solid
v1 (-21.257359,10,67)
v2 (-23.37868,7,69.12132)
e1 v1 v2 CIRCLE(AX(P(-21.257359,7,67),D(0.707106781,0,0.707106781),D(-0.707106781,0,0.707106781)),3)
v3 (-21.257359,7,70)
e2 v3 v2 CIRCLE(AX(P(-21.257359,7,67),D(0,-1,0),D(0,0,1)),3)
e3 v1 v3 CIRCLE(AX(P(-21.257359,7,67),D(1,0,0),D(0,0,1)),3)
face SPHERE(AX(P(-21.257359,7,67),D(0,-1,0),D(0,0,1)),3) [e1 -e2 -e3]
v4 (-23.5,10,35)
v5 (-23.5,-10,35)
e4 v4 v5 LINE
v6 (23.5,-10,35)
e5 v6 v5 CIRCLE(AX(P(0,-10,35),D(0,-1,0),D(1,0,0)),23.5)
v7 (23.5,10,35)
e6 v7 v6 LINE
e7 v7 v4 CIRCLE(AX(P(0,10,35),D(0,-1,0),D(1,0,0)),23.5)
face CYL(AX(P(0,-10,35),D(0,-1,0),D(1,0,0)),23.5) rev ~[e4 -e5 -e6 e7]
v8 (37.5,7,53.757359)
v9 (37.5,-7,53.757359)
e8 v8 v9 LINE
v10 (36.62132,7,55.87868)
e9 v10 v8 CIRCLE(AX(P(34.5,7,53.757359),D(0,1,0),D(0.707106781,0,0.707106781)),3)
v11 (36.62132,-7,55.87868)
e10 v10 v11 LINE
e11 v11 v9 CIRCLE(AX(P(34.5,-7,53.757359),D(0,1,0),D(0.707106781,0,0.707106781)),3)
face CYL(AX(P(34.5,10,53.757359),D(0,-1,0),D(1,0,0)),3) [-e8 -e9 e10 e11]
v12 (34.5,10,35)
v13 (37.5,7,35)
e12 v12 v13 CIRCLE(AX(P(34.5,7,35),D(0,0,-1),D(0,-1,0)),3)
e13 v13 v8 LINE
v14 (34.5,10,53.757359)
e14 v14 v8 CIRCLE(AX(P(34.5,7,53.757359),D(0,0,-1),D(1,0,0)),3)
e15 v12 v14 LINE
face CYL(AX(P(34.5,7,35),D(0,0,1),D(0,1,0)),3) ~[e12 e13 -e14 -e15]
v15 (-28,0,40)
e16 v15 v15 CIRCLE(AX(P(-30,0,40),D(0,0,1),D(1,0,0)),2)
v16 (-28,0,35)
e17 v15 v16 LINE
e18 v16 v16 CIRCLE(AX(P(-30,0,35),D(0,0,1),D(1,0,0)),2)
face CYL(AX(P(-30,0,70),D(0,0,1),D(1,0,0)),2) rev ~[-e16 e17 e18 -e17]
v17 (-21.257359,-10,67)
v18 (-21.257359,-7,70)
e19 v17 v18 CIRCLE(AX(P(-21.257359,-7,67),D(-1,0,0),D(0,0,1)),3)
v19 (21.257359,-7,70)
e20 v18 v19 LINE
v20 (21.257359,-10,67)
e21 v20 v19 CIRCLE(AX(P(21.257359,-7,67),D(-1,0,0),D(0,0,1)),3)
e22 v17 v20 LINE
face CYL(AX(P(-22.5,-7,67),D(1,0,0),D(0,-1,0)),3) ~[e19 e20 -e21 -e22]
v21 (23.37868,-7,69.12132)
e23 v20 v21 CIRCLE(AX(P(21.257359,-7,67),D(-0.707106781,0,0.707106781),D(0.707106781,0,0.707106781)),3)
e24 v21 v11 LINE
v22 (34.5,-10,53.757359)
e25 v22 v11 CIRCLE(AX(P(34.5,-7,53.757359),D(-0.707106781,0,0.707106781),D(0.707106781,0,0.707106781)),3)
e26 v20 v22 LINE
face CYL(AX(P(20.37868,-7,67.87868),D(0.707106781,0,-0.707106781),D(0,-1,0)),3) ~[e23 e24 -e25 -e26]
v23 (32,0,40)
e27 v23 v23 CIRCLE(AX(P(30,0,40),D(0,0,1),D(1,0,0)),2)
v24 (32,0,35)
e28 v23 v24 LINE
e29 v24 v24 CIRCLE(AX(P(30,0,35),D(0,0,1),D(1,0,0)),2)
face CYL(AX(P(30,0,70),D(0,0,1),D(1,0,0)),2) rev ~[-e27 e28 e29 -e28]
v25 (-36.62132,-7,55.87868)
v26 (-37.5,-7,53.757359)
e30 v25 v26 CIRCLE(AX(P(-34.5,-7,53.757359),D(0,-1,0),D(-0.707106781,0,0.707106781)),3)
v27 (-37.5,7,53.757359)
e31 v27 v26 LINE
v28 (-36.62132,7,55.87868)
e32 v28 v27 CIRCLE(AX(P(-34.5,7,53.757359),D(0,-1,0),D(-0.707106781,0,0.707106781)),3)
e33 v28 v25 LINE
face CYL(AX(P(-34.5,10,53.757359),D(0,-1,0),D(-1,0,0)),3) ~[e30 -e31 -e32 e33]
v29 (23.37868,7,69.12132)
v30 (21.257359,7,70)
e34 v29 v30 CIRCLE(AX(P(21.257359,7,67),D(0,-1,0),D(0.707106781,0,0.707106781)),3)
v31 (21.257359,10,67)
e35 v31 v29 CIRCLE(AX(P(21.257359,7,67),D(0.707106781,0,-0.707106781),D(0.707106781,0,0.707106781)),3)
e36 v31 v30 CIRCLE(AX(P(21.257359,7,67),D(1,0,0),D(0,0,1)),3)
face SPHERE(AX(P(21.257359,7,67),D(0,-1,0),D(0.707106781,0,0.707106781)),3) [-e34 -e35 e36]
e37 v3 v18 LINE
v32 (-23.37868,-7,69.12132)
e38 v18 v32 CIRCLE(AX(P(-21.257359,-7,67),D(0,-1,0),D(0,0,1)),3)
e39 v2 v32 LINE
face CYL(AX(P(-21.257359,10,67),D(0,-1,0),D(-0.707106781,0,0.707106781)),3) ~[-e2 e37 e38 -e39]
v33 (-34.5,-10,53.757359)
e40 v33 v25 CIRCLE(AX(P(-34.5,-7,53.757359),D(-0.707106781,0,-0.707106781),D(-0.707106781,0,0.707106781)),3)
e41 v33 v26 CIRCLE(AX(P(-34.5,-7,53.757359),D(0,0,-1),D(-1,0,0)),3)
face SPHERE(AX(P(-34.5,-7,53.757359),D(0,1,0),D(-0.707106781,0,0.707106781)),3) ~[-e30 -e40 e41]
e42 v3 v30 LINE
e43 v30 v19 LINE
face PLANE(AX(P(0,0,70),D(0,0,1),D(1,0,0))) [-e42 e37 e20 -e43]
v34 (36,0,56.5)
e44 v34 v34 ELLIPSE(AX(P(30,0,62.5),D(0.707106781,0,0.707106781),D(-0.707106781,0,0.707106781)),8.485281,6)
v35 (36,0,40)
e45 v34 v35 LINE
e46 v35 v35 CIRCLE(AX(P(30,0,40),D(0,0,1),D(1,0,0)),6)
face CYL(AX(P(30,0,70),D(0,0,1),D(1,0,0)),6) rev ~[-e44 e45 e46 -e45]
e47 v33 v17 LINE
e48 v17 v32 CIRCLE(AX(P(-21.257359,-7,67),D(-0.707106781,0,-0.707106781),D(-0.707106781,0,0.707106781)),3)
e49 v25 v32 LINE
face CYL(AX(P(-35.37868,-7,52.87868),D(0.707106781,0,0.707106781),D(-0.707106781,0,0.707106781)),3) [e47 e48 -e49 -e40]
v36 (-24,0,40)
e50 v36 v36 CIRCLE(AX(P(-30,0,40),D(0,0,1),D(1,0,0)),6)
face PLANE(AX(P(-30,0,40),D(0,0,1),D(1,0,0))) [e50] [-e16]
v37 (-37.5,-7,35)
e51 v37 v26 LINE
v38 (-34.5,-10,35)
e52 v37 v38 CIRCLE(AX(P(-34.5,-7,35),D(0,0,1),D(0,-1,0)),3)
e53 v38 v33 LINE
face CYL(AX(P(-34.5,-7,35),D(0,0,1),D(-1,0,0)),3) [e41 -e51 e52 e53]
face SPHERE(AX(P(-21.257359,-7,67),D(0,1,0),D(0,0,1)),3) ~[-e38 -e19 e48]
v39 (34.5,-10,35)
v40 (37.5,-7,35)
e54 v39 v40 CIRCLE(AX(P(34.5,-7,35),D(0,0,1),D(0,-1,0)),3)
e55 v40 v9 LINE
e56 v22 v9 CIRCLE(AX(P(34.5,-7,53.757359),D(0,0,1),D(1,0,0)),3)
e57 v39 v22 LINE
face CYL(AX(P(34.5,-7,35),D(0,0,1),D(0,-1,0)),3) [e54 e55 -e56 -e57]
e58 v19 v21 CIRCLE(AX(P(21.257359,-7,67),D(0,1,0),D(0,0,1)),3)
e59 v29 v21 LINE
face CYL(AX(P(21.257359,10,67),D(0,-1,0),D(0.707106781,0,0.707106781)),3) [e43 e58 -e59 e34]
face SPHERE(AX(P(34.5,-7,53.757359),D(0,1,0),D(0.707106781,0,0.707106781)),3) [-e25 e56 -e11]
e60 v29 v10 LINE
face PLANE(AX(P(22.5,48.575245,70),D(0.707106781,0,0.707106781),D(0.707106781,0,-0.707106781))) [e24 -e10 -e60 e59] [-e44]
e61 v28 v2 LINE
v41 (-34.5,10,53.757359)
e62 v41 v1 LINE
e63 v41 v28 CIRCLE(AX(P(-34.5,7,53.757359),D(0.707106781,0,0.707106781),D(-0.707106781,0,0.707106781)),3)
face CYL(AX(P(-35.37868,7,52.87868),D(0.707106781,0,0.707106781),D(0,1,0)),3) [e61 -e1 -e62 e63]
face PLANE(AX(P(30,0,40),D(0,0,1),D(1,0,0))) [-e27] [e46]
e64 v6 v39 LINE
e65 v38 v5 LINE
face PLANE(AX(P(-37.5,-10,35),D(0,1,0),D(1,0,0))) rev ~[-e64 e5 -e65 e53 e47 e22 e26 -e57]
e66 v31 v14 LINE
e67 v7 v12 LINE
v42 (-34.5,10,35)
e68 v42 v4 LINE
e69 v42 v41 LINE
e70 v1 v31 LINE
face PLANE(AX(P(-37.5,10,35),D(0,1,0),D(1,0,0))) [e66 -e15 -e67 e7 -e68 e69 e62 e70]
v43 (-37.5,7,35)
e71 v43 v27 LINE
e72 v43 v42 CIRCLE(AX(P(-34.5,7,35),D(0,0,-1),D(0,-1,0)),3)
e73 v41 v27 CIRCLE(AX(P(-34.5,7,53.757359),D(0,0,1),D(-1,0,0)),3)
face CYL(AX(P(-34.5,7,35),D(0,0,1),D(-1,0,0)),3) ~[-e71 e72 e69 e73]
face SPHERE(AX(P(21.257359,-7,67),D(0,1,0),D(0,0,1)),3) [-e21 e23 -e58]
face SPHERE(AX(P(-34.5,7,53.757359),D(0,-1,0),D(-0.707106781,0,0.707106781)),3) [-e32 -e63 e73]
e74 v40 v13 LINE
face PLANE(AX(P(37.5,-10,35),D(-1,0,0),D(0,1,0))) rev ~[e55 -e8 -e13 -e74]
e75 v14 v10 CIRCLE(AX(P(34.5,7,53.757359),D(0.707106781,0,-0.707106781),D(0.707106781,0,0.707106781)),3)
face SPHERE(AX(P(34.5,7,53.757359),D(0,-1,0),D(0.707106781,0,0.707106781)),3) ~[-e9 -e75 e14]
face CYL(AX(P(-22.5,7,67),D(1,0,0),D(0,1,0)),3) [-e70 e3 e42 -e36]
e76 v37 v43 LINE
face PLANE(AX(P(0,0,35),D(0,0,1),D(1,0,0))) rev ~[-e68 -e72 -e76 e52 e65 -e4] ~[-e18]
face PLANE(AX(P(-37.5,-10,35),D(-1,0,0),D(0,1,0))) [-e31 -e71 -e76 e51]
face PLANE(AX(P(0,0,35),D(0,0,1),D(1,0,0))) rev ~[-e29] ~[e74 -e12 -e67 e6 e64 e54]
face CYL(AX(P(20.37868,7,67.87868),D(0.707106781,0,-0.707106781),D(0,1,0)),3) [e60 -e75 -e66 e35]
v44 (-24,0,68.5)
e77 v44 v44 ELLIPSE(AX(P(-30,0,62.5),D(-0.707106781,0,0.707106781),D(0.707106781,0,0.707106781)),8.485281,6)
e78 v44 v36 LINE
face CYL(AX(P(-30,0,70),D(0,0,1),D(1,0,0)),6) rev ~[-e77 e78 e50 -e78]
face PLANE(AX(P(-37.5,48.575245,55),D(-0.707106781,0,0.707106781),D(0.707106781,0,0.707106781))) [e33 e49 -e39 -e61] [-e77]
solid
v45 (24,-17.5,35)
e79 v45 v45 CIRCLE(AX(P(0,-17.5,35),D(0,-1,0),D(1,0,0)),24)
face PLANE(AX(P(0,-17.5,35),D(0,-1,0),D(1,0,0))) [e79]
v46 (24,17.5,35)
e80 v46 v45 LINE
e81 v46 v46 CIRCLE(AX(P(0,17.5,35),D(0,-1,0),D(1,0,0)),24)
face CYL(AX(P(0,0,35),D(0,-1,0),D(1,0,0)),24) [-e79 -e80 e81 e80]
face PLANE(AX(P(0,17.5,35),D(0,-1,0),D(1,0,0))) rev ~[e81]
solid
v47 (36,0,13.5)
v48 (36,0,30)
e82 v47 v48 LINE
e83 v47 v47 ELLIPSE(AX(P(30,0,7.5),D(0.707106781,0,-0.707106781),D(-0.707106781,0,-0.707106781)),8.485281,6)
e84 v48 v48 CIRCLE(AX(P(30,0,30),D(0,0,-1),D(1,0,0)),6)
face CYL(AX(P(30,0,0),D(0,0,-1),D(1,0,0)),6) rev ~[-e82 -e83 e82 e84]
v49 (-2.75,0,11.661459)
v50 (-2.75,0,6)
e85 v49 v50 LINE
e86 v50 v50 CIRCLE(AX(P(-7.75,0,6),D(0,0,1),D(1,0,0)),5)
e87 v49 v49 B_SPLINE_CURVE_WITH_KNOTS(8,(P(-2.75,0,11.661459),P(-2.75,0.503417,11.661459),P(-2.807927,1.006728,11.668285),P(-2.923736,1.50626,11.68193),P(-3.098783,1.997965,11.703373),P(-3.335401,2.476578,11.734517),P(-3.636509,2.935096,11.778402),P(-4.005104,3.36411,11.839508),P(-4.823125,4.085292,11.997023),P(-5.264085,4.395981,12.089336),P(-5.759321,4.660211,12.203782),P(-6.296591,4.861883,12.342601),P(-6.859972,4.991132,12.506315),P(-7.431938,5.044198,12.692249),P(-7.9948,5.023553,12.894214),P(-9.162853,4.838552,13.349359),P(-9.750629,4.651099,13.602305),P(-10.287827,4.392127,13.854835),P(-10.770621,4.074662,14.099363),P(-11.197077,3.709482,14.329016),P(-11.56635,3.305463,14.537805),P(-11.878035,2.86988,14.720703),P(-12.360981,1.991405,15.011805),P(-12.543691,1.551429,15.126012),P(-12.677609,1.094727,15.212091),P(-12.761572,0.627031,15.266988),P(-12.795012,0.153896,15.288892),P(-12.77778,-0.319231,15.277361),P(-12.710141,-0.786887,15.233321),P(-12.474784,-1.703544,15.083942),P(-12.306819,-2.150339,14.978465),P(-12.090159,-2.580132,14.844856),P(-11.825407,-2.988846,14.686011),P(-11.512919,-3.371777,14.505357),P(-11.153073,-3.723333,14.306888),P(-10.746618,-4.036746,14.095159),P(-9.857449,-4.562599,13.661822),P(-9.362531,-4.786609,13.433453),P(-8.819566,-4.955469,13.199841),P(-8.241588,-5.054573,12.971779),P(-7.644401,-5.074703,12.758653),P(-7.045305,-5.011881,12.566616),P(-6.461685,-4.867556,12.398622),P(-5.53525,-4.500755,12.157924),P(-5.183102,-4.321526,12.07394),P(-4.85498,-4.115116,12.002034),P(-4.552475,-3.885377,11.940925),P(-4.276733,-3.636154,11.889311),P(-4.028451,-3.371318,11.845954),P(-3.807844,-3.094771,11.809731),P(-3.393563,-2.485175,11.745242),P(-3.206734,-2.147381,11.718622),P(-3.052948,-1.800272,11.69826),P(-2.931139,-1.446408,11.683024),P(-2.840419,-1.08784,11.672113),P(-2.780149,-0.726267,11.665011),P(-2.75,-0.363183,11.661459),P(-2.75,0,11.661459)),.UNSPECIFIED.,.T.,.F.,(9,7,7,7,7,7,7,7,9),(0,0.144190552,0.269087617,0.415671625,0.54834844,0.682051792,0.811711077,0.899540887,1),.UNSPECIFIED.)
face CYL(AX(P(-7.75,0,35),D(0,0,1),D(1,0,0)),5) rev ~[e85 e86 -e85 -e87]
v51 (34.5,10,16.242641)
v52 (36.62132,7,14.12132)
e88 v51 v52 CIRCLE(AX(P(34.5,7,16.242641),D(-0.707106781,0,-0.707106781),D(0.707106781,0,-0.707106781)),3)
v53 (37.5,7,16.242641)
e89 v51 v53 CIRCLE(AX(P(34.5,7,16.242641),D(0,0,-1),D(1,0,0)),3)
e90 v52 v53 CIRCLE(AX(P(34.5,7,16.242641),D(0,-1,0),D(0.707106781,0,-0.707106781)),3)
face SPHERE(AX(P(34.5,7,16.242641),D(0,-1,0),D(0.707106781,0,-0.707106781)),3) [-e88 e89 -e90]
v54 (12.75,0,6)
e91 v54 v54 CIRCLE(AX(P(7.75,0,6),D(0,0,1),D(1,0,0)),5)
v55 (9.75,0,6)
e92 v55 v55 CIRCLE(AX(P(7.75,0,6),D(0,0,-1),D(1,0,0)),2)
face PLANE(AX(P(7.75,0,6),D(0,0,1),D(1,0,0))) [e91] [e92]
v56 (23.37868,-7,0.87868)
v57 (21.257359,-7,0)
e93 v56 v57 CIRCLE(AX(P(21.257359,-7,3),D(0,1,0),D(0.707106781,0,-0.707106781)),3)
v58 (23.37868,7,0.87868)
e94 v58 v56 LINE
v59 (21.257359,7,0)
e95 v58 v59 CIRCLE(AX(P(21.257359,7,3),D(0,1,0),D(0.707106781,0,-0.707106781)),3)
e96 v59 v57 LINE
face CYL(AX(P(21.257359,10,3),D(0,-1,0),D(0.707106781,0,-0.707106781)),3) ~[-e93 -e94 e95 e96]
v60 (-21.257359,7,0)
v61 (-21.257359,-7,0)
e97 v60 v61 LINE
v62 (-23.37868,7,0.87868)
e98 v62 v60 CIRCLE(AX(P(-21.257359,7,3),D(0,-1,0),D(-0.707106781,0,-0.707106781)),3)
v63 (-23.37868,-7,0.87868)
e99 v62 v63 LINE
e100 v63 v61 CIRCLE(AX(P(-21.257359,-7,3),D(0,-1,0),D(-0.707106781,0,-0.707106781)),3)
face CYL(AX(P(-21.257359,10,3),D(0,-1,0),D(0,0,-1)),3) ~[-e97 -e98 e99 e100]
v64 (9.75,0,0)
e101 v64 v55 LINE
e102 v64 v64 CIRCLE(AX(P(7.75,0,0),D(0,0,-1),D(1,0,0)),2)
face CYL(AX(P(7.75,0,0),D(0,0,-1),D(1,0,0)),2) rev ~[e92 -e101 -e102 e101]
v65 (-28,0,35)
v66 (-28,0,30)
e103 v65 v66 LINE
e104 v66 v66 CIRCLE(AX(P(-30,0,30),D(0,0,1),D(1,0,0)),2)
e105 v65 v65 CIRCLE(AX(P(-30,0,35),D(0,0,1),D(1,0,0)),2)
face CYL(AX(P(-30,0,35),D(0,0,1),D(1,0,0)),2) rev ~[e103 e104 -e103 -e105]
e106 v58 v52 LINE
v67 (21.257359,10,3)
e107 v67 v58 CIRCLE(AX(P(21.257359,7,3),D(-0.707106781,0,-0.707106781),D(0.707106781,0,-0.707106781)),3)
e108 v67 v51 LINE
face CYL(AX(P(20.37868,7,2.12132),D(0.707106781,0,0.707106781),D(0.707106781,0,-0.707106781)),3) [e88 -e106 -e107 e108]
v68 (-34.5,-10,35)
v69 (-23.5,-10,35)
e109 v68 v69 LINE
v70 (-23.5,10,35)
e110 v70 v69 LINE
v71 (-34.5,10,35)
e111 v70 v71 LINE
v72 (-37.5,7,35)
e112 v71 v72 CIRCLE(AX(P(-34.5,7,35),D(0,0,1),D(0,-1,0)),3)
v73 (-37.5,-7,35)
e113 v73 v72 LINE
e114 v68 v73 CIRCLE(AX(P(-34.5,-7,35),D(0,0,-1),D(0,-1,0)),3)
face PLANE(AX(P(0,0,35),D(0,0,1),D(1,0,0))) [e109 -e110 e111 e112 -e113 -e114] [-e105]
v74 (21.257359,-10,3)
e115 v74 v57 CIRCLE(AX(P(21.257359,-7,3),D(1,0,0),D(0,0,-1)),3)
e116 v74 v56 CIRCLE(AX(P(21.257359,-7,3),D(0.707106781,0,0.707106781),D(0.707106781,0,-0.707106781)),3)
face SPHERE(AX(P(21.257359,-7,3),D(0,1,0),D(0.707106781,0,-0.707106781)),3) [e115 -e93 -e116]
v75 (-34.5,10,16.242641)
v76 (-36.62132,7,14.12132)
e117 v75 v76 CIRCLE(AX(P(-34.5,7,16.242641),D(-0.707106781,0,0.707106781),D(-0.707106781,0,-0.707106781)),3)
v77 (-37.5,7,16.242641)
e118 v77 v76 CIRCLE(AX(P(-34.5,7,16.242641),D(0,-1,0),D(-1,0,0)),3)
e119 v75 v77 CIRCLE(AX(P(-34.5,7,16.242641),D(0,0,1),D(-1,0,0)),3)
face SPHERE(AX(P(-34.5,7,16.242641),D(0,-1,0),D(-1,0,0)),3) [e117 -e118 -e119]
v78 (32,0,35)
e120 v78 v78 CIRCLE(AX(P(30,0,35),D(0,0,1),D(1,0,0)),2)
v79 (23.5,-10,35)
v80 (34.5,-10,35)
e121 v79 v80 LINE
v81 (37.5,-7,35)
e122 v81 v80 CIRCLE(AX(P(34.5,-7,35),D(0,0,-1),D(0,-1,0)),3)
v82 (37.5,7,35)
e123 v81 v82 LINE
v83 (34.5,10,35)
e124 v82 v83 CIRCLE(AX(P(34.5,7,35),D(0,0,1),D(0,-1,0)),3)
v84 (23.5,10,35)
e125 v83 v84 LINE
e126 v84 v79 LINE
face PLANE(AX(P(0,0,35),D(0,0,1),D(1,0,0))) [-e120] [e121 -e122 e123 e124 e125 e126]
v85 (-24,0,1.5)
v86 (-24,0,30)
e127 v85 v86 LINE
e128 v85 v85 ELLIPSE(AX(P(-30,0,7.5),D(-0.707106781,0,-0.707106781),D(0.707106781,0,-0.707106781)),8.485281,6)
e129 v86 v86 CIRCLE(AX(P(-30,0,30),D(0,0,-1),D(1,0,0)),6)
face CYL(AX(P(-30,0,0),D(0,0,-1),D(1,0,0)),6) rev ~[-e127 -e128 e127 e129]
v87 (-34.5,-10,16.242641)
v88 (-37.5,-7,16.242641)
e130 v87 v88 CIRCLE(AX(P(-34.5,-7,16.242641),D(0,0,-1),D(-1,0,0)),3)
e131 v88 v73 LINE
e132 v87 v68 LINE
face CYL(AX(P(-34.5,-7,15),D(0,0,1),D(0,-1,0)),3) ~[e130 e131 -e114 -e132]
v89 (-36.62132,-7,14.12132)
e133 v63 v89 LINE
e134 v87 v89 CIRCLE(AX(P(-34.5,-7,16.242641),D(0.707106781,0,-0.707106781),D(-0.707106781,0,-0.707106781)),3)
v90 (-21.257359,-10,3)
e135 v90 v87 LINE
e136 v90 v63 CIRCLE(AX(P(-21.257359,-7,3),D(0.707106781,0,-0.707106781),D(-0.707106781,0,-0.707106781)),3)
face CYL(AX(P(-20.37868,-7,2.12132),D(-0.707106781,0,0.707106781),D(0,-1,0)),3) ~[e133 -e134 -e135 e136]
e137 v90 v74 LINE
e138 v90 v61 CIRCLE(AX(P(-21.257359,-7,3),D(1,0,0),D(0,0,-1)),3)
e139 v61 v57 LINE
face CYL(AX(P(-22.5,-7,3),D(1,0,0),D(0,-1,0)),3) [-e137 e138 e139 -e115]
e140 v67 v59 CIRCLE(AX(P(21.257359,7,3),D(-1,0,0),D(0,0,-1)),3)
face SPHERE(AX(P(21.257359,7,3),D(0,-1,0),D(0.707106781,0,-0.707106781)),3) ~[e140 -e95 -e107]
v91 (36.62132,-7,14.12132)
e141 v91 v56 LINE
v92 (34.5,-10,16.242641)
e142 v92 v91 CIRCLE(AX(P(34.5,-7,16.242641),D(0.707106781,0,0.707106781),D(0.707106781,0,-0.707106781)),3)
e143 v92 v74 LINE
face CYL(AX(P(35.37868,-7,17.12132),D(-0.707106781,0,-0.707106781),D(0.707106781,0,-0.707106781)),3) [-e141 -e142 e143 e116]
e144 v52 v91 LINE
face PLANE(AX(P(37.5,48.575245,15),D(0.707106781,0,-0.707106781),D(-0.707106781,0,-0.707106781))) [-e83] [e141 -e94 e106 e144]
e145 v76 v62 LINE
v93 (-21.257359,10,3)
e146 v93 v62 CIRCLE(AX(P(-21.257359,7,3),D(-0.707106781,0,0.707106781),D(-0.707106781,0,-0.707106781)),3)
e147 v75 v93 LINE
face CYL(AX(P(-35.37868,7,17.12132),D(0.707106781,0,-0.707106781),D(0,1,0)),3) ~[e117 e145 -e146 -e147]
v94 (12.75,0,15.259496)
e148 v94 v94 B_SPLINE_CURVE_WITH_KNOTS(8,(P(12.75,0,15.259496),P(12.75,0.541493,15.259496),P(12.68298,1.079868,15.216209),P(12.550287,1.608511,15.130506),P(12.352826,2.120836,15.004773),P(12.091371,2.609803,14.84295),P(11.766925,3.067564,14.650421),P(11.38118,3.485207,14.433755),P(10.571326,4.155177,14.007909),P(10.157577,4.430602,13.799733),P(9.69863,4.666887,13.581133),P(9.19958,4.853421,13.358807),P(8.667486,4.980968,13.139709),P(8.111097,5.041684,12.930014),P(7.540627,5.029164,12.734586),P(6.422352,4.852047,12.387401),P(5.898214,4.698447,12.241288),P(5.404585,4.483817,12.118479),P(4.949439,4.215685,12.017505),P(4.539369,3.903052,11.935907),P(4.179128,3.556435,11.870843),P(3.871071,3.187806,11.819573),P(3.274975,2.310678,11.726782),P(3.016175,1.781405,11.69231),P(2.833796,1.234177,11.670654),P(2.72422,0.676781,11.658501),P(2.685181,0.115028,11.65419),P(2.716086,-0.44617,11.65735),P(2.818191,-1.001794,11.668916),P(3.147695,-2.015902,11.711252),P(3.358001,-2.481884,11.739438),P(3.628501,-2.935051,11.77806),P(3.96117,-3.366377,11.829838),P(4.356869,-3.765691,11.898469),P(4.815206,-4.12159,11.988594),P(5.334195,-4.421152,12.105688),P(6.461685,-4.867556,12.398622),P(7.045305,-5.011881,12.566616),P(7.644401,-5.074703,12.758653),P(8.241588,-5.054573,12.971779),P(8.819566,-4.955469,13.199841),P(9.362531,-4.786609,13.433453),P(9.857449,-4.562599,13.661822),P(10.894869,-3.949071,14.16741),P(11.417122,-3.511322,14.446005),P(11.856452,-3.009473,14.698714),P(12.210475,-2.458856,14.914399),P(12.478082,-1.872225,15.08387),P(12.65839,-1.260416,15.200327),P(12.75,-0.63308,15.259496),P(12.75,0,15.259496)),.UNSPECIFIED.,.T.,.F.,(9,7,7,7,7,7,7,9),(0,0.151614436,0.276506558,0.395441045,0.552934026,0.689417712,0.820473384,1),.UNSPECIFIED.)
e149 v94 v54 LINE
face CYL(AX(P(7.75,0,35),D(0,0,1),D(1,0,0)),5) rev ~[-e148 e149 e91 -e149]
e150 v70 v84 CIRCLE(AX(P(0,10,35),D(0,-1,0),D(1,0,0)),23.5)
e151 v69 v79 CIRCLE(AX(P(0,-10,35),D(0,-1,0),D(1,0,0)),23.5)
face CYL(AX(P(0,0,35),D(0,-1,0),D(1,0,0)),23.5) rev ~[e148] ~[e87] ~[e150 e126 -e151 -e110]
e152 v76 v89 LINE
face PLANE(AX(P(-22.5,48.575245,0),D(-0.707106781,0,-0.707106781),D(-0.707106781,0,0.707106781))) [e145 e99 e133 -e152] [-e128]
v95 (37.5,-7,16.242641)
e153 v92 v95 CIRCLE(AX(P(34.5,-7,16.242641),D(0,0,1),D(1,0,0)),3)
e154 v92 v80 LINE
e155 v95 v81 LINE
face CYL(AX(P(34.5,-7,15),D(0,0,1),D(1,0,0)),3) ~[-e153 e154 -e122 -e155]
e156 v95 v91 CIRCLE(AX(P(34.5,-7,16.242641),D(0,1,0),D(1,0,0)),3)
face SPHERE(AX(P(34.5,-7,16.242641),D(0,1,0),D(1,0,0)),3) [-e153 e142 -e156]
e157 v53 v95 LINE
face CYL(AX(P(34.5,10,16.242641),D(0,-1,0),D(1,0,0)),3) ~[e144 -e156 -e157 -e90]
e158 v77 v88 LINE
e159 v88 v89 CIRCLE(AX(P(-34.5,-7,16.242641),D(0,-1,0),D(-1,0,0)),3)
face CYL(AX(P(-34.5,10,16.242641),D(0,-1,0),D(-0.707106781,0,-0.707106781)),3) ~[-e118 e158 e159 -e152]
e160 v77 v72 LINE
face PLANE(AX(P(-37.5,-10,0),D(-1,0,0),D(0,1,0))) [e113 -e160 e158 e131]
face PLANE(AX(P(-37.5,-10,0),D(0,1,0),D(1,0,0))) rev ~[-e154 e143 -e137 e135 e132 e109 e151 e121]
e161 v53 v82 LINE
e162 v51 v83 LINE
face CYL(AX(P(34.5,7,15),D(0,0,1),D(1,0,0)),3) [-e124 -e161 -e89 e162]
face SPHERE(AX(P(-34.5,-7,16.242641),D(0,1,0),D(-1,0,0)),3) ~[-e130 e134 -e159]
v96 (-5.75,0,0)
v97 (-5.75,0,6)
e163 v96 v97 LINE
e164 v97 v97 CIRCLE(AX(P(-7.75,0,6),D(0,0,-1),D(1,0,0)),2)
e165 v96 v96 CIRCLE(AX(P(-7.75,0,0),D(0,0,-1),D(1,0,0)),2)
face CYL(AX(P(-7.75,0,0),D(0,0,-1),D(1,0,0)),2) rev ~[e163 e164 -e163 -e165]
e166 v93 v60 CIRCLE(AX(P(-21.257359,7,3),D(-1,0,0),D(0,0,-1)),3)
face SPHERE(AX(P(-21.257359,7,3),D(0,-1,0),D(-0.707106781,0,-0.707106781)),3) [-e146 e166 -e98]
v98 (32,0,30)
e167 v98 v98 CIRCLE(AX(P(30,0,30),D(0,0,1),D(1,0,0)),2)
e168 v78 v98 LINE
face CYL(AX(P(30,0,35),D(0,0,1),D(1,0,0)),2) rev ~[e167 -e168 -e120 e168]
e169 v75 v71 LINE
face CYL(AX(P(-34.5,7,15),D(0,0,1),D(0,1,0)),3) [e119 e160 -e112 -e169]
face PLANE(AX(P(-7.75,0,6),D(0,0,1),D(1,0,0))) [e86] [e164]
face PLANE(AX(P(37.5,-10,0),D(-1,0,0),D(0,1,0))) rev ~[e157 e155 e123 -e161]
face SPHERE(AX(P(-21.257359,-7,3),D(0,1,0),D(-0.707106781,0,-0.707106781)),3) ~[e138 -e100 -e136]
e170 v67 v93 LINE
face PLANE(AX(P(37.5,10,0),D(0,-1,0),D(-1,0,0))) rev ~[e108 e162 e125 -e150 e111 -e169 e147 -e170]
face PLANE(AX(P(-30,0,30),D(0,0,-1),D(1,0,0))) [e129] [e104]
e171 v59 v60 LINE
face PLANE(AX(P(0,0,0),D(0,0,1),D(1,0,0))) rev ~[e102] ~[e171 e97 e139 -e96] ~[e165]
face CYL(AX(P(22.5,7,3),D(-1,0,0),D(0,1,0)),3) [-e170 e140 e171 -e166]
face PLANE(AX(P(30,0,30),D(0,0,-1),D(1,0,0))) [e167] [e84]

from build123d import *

# Parameters (mm, degrees)
F0_W          = 30
F0_H          = 20
F0_W_2        = 22.5
F1_DEPTH      = 35
F2_R          = 23.5
F3_DEPTH      = 25
F4_R          = 2
F5_DEPTH      = 25
F6_R          = 5
F7_DEPTH      = 29
F8_R          = 2
F9_DEPTH      = 35.001
F9_DEPTH_BACK = 107
F10_W         = 75
F10_H         = 20
F11_DEPTH     = 35
F12_R         = 23.5
F13_DEPTH     = 25
F14_R         = 2
F15_DEPTH     = 50
F16_R         = 6
F17_DEPTH     = 30
F18_T1_DEPTH  = 97.150489639
F19_T1_DEPTH  = 97.150489639
F20_R         = 24
F21_DEPTH     = 17.5
F22_R         = 3
F22_2_R       = 3
F23_R         = 6
F24_DEPTH     = 30


# Not quite as in the source:
# - a fillet or chamfer that OpenCascade refuses, or shapes differently, is made with other operations: its cross-section is extruded or revolved along the edge and cut away or added
# - an extrude ends at something that could not be found from the text; its depth is read off the source's solid
# - a feature names something its author has since deleted; it is built from what else it names


with BuildPart() as f1:
    # F0 (on Top) → F1 (new body)
    with BuildSketch(Plane.XY):
        Rectangle(F0_W, F0_H)
        with Locations((26.25, 0)):
            Rectangle(F0_W_2, F0_H)
        with Locations((-26.25, 0)):
            Rectangle(F0_W_2, F0_H)
    extrude(amount=F1_DEPTH)

    # F2 (on Front) → F3 (cut, symmetric)
    with BuildSketch(Plane.XZ):
        with Locations((0, 35)):
            Circle(F2_R)
    extrude(amount=F3_DEPTH, both=True, mode=Mode.SUBTRACT)

    # F4 (on face) → F5 (cut)
    with BuildSketch(Plane(origin=(0, 0, 0), x_dir=(1, 0, 0), z_dir=(0, 0, -1))):
        with Locations((7.75, 0)):
            Circle(F4_R)
        with Locations((-7.75, 0)):
            Circle(F4_R)
    extrude(amount=-F5_DEPTH, mode=Mode.SUBTRACT)

    # F6 (on face) → F7 (cut)
    with BuildSketch(Plane.XY.offset(35)):
        with Locations((7.75, 0)):
            Circle(F6_R)
        with Locations((-7.75, 0)):
            Circle(F6_R)
    extrude(amount=-F7_DEPTH, mode=Mode.SUBTRACT)

    # F8 (on face) → F9 (cut, two sides)
    with BuildSketch(Plane.XY.offset(35)) as f9_sk:
        with Locations((30, 0)):
            Circle(F8_R)
        with Locations((-30, 0)):
            Circle(F8_R)
    extrude(amount=-F9_DEPTH, mode=Mode.SUBTRACT)
    extrude(f9_sk.sketch, amount=F9_DEPTH_BACK, mode=Mode.SUBTRACT)

    # F19: chamfer of 15 on 2 edges, made by hand

    # F19_s2 → F19_t1 (cut)
    with BuildSketch(Plane.XZ.offset(-48.5752448195)):
        Polygon((37.5, 15), (22.5, 0), (37.5, 0), align=None)
        Polygon((-22.5, 0), (-37.5, 15), (-37.5, 0), align=None)
    extrude(amount=F19_T1_DEPTH, mode=Mode.SUBTRACT)

    # F22
    f22_edges = [f1.edges().sort_by_distance(p)[0] for p in [
        (37.5, -10, 25),
        (30, -10, 7.5),
        (37.5, 0, 15),
        (-37.5, -10, 25),
        (-30, -10, 7.5),
        (-37.5, 10, 25),
        (-30, 10, 7.5),
        (30, 10, 7.5),
        (37.5, 10, 25),
        (-37.5, 0, 15),
        (0, -10, 0),
        (0, 10, 0),
        (22.5, 0, 0),
        (-22.5, 0, 0),
    ]]
    fillet(f22_edges, radius=F22_R)

    # F23 (on face) → F24 (cut)
    with BuildSketch(Plane(origin=(0, 0, 0), x_dir=(1, 0, 0), z_dir=(0, 0, -1))):
        with Locations((30, 0)):
            Circle(F23_R)
        with Locations((-30, 0)):
            Circle(F23_R)
    extrude(amount=-F24_DEPTH, mode=Mode.SUBTRACT)


with BuildPart() as f11:
    # F10 (on face) → F11 (new body)
    with BuildSketch(Plane.XY.offset(35)):
        Rectangle(F10_W, F10_H)
    extrude(amount=F11_DEPTH)

    # F12 (on face) → F13 (cut, symmetric)
    with BuildSketch(Plane.XZ.offset(10)):
        with Locations((0, 35)):
            Circle(F12_R)
    extrude(amount=F13_DEPTH, both=True, mode=Mode.SUBTRACT)

    # F14 (on face) → F15 (cut)
    with BuildSketch(Plane.XY.offset(70)):
        with Locations((30, 0)):
            Circle(F14_R)
        with Locations((-30, 0)):
            Circle(F14_R)
    extrude(amount=-F15_DEPTH, mode=Mode.SUBTRACT)

    # F16 (on face) → F17 (cut)
    with BuildSketch(Plane.XY.offset(70)):
        with Locations((30, 0)):
            Circle(F16_R)
        with Locations((-30, 0)):
            Circle(F16_R)
    extrude(amount=-F17_DEPTH, mode=Mode.SUBTRACT)

    # F18: chamfer of 15 on 2 edges, made by hand

    # F18_s2 → F18_t1 (cut)
    with BuildSketch(Plane.XZ.offset(-48.5752448195)):
        Polygon((22.5, 70), (37.5, 55), (37.5, 70), align=None)
        Polygon((-37.5, 55), (-22.5, 70), (-37.5, 70), align=None)
    extrude(amount=F18_T1_DEPTH, mode=Mode.SUBTRACT)

    # F22#2
    f22_2_edges = [f11.edges().sort_by_distance(p)[0] for p in [
        (22.5, 0, 70),
        (37.5, 0, 55),
        (0, -10, 70),
        (30, -10, 62.5),
        (37.5, -10, 45),
        (-30, -10, 62.5),
        (-37.5, -10, 45),
        (30, 10, 62.5),
        (0, 10, 70),
        (-30, 10, 62.5),
        (-37.5, 10, 45),
        (37.5, 10, 45),
        (-37.5, 0, 55),
        (-22.5, 0, 70),
    ]]
    fillet(f22_2_edges, radius=F22_2_R)


with BuildPart() as f21:
    # F20 (on Front) → F21 (new body, symmetric)
    with BuildSketch(Plane.XZ):
        with Locations((0, 35)):
            Circle(F20_R)
    extrude(amount=F21_DEPTH, both=True)


solid = Compound([f1.part, f11.part, f21.part])
